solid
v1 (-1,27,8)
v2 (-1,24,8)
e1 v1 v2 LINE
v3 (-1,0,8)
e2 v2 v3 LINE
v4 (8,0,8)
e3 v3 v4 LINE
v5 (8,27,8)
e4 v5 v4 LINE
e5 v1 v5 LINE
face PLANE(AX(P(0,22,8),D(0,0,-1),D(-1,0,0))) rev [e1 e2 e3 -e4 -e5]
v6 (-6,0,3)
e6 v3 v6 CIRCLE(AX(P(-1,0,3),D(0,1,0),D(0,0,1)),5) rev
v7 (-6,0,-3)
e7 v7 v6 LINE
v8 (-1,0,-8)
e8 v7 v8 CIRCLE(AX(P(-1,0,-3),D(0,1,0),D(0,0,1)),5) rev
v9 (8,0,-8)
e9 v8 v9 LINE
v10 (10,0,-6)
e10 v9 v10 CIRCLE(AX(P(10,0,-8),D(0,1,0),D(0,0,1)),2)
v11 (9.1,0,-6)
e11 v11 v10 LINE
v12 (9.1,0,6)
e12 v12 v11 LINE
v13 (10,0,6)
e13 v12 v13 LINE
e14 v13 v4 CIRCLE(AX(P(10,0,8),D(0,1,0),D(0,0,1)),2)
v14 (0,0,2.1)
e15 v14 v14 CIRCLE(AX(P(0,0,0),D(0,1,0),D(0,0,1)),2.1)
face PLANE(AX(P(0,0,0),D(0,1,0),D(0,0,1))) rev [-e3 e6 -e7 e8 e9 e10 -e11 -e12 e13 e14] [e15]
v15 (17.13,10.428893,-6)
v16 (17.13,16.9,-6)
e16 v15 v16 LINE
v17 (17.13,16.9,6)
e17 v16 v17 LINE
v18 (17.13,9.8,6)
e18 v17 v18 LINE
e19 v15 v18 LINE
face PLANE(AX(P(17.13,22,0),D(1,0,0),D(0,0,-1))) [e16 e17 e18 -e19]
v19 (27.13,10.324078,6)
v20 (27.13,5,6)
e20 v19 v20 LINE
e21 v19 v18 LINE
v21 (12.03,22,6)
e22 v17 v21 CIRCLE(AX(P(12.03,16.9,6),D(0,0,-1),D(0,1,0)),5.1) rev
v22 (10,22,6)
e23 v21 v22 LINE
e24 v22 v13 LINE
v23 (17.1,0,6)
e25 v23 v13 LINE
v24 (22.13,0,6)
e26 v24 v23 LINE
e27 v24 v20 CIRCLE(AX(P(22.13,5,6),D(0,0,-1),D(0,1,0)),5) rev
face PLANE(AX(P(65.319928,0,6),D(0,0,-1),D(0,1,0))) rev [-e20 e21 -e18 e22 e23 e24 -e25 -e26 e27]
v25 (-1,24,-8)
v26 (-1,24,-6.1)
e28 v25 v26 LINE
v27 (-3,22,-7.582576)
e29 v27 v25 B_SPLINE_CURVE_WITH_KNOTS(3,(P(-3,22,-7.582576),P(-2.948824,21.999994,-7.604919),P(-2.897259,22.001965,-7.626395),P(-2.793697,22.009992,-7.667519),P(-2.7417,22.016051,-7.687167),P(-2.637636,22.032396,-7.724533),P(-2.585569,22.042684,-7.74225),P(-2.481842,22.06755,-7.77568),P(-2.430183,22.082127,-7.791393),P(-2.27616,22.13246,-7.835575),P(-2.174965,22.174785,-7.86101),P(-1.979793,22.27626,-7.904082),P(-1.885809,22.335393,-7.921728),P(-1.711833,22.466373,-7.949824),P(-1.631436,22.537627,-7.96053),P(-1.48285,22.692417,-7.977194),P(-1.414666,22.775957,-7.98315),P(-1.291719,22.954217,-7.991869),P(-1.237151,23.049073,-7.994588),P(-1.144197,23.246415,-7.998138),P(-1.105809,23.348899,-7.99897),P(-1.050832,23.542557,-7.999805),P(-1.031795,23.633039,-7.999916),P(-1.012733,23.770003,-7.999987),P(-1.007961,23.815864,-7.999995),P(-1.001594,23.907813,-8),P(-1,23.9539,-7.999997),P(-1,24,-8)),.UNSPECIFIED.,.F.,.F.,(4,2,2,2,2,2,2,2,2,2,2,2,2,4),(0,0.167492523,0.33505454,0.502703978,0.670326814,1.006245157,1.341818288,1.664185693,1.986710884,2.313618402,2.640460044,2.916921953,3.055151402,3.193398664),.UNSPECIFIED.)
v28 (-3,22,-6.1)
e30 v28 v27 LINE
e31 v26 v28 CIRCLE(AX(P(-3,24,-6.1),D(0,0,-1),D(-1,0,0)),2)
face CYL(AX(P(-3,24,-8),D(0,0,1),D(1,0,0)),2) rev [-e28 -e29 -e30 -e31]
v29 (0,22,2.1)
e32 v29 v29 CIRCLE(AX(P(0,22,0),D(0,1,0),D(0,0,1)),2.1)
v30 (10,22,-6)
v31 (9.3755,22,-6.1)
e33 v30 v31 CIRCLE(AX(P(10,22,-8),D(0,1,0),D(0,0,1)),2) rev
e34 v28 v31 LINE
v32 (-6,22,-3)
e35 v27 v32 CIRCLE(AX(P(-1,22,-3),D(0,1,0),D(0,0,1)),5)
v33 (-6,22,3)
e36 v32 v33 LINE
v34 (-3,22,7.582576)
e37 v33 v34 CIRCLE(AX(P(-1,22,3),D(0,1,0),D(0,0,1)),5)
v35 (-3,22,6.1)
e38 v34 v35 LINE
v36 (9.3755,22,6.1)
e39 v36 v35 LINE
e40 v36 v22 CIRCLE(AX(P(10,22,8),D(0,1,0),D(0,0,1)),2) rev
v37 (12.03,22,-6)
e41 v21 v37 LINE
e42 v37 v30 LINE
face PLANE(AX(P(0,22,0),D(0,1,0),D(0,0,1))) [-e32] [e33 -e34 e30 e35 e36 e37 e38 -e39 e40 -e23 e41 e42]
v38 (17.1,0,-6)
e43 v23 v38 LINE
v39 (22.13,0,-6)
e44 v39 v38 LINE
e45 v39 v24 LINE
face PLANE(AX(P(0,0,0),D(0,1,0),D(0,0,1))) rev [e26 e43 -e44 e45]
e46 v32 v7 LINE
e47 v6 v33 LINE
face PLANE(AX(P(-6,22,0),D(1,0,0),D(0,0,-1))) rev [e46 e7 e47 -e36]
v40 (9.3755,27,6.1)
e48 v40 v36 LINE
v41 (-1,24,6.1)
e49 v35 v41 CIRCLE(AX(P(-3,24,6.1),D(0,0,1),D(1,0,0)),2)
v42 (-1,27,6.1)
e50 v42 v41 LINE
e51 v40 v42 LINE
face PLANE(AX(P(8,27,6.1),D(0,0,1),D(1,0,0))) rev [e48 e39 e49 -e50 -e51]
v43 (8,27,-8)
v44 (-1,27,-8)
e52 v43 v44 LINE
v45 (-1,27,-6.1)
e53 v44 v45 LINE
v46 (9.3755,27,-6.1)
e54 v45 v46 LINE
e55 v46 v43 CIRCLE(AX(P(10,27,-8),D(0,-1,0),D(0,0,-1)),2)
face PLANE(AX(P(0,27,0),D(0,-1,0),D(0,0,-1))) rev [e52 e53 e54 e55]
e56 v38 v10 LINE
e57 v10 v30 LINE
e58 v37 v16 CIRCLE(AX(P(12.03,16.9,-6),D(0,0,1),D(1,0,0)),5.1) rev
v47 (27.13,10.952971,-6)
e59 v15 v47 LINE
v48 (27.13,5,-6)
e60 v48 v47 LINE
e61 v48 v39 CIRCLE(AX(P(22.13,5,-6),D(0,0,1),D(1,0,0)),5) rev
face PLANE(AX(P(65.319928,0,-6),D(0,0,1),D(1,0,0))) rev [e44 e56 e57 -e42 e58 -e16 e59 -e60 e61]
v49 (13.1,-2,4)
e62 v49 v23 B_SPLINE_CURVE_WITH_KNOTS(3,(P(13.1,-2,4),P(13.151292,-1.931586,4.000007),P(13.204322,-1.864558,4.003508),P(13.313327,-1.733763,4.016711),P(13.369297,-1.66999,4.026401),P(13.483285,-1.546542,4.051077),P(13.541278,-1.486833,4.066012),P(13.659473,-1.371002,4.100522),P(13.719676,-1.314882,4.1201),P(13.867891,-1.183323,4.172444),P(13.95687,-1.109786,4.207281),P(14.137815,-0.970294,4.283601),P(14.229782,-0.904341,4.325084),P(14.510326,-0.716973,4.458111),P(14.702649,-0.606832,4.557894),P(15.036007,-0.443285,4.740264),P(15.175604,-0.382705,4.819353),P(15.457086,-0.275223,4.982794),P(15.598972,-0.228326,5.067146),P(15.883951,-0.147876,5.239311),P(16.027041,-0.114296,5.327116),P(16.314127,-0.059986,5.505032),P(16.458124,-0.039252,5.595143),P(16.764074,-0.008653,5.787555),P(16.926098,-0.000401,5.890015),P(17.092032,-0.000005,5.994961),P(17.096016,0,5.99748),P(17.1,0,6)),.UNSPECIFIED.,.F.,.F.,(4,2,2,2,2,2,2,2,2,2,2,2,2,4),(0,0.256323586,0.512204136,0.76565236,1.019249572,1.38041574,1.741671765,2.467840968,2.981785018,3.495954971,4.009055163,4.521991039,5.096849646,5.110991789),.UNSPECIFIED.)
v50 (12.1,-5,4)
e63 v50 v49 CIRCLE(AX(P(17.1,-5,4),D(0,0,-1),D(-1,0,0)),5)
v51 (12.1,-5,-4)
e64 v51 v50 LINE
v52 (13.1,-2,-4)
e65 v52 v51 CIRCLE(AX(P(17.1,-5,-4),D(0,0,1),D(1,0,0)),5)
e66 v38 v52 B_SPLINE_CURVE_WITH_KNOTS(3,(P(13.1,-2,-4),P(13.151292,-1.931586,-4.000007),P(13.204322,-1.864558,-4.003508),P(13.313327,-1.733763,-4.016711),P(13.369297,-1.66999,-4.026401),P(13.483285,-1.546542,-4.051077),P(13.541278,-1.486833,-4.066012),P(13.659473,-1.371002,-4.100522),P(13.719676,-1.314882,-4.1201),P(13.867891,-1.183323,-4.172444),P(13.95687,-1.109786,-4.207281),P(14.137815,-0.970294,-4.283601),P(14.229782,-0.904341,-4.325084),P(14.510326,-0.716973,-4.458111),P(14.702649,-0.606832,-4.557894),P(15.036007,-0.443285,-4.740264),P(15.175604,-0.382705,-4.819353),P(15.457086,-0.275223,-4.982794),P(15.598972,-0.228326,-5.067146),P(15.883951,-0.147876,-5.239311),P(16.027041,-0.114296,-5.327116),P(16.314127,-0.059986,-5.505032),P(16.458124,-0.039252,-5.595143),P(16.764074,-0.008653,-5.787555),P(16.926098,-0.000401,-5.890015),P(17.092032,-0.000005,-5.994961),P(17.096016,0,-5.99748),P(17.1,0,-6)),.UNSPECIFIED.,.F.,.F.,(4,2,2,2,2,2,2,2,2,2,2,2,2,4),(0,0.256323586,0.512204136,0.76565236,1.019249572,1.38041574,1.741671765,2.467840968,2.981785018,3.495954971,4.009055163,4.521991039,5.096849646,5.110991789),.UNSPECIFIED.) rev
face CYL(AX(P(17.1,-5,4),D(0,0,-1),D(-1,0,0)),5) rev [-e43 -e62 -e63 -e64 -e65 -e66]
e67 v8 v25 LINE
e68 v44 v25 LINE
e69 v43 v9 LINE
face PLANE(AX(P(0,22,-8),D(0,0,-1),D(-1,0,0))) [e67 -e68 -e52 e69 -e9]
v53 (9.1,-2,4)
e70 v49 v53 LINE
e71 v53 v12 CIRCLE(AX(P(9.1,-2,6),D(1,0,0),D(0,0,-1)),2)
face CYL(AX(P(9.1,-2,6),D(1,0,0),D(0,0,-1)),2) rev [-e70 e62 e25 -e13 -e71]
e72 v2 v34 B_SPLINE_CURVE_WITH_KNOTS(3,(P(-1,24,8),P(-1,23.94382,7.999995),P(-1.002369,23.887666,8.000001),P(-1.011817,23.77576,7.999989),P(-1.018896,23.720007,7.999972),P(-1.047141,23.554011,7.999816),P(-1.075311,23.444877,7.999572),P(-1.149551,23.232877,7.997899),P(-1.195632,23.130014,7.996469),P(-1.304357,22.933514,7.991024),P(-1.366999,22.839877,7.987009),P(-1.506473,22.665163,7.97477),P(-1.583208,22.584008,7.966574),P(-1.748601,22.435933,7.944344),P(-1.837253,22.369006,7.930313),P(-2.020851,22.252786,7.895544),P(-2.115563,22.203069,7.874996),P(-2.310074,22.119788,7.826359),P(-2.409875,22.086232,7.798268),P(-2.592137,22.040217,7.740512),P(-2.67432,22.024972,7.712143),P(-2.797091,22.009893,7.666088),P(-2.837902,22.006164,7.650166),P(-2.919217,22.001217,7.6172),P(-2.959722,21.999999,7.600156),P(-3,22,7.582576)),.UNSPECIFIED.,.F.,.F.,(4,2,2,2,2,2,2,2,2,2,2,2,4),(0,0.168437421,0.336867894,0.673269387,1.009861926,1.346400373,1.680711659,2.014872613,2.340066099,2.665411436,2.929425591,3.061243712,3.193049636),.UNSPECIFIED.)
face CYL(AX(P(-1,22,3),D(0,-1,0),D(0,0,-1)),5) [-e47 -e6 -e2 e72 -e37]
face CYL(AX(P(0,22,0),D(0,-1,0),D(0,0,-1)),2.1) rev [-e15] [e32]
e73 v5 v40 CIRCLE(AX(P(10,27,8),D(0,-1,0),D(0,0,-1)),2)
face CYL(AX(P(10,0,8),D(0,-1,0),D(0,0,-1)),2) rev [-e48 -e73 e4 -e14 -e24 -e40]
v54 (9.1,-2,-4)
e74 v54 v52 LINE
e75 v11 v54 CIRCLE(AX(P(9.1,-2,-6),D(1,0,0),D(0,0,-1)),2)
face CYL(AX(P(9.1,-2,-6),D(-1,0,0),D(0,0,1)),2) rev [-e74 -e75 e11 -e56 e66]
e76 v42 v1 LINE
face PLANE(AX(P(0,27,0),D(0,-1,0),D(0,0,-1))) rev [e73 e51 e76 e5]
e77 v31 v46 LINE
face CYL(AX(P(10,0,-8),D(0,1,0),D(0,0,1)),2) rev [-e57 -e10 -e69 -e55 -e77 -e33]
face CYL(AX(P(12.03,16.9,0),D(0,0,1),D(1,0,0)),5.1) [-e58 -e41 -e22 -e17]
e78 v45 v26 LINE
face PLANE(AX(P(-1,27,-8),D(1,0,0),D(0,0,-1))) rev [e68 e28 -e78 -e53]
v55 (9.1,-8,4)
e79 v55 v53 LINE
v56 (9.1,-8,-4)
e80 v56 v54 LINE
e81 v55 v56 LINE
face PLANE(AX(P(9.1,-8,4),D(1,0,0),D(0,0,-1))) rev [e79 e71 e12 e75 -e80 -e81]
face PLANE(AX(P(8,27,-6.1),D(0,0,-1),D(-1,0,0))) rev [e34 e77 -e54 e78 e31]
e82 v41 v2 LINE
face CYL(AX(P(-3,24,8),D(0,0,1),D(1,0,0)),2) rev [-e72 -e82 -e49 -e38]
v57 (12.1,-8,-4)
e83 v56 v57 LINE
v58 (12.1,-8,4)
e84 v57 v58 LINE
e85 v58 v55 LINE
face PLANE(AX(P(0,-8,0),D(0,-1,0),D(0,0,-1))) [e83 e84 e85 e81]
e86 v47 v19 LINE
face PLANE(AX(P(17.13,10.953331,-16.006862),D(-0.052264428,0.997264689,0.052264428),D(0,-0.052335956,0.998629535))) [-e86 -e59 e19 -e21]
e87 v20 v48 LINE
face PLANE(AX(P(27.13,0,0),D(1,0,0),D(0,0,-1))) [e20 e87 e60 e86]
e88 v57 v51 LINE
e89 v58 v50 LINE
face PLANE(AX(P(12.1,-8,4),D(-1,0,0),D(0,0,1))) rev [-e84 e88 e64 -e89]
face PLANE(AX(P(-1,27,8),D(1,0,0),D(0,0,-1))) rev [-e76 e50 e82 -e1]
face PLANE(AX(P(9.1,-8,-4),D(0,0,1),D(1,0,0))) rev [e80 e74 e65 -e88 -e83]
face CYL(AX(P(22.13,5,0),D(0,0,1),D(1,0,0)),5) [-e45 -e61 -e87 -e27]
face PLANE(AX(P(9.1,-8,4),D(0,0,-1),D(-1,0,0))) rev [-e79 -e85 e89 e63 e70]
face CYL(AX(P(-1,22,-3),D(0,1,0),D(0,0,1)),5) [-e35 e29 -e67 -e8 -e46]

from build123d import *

# Parameters (mm, degrees)
SKETCH1_W           = 12
SKETCH1_H           = 16
SKETCH1_R           = 2.1
SKETCH1_W_2         = 2
BOSS_EXTRUDE1_DEPTH = 22
FILLET1_R           = 5
SKETCH2_W           = 9
SKETCH2_H           = 1.9
BOSS_EXTRUDE2_DEPTH = 5
SKETCH4_W           = 12
SKETCH4_H           = 22
BOSS_EXTRUDE3_DEPTH = 9.13
FILLET2_R           = 5.1
SKETCH5_W           = 3
SKETCH5_H           = 8
BOSS_EXTRUDE4_DEPTH = 8
FILLET3_R           = 2
BOSS_EXTRUDE5_DEPTH = 10
BOSS_EXTRUDE6_DEPTH = 12.016468152
FILLET4_R           = 5
FILLET5_R           = 2
FILLET6_R           = 5


with BuildPart() as part:
    # Sketch1 → Boss-Extrude1 (new body)
    # profile 1 of 2: a face of its own
    with BuildSketch(Plane(origin=(0, 0, 0), x_dir=(1, 0, 0), z_dir=(0, 1, 0))):
        Rectangle(SKETCH1_W, SKETCH1_H)
        with Locations(Location((0, 0, 0), (0, 0, 270))):
            Circle(SKETCH1_R, mode=Mode.SUBTRACT)
    # profile 2 of 2: a face of its own
    with BuildSketch(Plane(origin=(0, 0, 0), x_dir=(1, 0, 0), z_dir=(0, 1, 0))):
        with Locations((7, 0)):
            Rectangle(SKETCH1_W_2, SKETCH1_H)
    extrude(amount=BOSS_EXTRUDE1_DEPTH)

    # Fillet1
    fillet1_edges = [part.edges().sort_by_distance(p)[0] for p in [
        (-6, 11, 8),
        (-6, 11, -8),
    ]]
    fillet(fillet1_edges, radius=FILLET1_R)

    # Sketch2 → Boss-Extrude2 (add)
    with BuildSketch(Plane(origin=(0, 22, 0), x_dir=(1, 0, 0), z_dir=(0, 1, 0))):
        with Locations((3.5, 7.05)):
            Rectangle(SKETCH2_W, SKETCH2_H)
        with Locations((3.5, -7.05)):
            Rectangle(SKETCH2_W, SKETCH2_H)
    extrude(amount=BOSS_EXTRUDE2_DEPTH)

    # Sketch4 → Boss-Extrude3 (add)
    with BuildSketch(Plane(origin=(8, 0, 0), x_dir=(0, 0, -1), z_dir=(1, 0, 0))):
        with Locations((0, 11)):
            Rectangle(SKETCH4_W, SKETCH4_H)
    extrude(amount=BOSS_EXTRUDE3_DEPTH)

    # Fillet2
    fillet2_edges = [part.edges().sort_by_distance(p)[0] for p in [
        (17.13, 22, 0),
    ]]
    fillet(fillet2_edges, radius=FILLET2_R)

    # Sketch5 → Boss-Extrude4 (add)
    with BuildSketch(Plane.XZ):
        with Locations((10.6, 0)):
            Rectangle(SKETCH5_W, SKETCH5_H)
    extrude(amount=BOSS_EXTRUDE4_DEPTH)

    # Fillet3
    fillet3_edges = [part.edges().sort_by_distance(p)[0] for p in [
        (10.6, 0, 4),
        (10.6, 0, -4),
    ]]
    fillet(fillet3_edges, radius=FILLET3_R - 0.0001)  # a hair under: the kernel refuses the full size

    # Sketch6 → Boss-Extrude5 (add)
    with BuildSketch(Plane(origin=(17.13, 0, 0), x_dir=(0, 0, -1), z_dir=(1, 0, 0))):
        Polygon((-6, 9.8), (6, 10.428893351), (6, 0), (-6, 0), align=None)
    extrude(amount=BOSS_EXTRUDE5_DEPTH)

    # Sketch8 → Boss-Extrude6 (add, along a direction that is not the sketch's normal)
    with BuildSketch(Plane.XY.offset(6)):
        Polygon((17.13, 9.8), (27.13, 10.324077793), (27.13, 9.8), align=None)
    extrude(amount=-BOSS_EXTRUDE6_DEPTH, dir=(0, -0.052335956242944494, 0.9986295347545739))

    # Fillet4
    fillet4_edges = [part.edges().sort_by_distance(p)[0] for p in [
        (12.1, 0, 0),
    ]]
    fillet(fillet4_edges, radius=FILLET4_R)

    # Fillet5
    fillet5_edges = [part.edges().sort_by_distance(p)[0] for p in [
        (-1, 22, -7.05),
        (-1, 22, 7.05),
        (8, 11, -6),
        (8, 11, 6),
    ]]
    fillet(fillet5_edges, radius=FILLET5_R - 0.0001)  # a hair under: the kernel refuses the full size

    # Fillet6
    fillet6_edges = [part.edges().sort_by_distance(p)[0] for p in [
        (27.13, 0, 0),
    ]]
    fillet(fillet6_edges, radius=FILLET6_R)


solid = part.part
